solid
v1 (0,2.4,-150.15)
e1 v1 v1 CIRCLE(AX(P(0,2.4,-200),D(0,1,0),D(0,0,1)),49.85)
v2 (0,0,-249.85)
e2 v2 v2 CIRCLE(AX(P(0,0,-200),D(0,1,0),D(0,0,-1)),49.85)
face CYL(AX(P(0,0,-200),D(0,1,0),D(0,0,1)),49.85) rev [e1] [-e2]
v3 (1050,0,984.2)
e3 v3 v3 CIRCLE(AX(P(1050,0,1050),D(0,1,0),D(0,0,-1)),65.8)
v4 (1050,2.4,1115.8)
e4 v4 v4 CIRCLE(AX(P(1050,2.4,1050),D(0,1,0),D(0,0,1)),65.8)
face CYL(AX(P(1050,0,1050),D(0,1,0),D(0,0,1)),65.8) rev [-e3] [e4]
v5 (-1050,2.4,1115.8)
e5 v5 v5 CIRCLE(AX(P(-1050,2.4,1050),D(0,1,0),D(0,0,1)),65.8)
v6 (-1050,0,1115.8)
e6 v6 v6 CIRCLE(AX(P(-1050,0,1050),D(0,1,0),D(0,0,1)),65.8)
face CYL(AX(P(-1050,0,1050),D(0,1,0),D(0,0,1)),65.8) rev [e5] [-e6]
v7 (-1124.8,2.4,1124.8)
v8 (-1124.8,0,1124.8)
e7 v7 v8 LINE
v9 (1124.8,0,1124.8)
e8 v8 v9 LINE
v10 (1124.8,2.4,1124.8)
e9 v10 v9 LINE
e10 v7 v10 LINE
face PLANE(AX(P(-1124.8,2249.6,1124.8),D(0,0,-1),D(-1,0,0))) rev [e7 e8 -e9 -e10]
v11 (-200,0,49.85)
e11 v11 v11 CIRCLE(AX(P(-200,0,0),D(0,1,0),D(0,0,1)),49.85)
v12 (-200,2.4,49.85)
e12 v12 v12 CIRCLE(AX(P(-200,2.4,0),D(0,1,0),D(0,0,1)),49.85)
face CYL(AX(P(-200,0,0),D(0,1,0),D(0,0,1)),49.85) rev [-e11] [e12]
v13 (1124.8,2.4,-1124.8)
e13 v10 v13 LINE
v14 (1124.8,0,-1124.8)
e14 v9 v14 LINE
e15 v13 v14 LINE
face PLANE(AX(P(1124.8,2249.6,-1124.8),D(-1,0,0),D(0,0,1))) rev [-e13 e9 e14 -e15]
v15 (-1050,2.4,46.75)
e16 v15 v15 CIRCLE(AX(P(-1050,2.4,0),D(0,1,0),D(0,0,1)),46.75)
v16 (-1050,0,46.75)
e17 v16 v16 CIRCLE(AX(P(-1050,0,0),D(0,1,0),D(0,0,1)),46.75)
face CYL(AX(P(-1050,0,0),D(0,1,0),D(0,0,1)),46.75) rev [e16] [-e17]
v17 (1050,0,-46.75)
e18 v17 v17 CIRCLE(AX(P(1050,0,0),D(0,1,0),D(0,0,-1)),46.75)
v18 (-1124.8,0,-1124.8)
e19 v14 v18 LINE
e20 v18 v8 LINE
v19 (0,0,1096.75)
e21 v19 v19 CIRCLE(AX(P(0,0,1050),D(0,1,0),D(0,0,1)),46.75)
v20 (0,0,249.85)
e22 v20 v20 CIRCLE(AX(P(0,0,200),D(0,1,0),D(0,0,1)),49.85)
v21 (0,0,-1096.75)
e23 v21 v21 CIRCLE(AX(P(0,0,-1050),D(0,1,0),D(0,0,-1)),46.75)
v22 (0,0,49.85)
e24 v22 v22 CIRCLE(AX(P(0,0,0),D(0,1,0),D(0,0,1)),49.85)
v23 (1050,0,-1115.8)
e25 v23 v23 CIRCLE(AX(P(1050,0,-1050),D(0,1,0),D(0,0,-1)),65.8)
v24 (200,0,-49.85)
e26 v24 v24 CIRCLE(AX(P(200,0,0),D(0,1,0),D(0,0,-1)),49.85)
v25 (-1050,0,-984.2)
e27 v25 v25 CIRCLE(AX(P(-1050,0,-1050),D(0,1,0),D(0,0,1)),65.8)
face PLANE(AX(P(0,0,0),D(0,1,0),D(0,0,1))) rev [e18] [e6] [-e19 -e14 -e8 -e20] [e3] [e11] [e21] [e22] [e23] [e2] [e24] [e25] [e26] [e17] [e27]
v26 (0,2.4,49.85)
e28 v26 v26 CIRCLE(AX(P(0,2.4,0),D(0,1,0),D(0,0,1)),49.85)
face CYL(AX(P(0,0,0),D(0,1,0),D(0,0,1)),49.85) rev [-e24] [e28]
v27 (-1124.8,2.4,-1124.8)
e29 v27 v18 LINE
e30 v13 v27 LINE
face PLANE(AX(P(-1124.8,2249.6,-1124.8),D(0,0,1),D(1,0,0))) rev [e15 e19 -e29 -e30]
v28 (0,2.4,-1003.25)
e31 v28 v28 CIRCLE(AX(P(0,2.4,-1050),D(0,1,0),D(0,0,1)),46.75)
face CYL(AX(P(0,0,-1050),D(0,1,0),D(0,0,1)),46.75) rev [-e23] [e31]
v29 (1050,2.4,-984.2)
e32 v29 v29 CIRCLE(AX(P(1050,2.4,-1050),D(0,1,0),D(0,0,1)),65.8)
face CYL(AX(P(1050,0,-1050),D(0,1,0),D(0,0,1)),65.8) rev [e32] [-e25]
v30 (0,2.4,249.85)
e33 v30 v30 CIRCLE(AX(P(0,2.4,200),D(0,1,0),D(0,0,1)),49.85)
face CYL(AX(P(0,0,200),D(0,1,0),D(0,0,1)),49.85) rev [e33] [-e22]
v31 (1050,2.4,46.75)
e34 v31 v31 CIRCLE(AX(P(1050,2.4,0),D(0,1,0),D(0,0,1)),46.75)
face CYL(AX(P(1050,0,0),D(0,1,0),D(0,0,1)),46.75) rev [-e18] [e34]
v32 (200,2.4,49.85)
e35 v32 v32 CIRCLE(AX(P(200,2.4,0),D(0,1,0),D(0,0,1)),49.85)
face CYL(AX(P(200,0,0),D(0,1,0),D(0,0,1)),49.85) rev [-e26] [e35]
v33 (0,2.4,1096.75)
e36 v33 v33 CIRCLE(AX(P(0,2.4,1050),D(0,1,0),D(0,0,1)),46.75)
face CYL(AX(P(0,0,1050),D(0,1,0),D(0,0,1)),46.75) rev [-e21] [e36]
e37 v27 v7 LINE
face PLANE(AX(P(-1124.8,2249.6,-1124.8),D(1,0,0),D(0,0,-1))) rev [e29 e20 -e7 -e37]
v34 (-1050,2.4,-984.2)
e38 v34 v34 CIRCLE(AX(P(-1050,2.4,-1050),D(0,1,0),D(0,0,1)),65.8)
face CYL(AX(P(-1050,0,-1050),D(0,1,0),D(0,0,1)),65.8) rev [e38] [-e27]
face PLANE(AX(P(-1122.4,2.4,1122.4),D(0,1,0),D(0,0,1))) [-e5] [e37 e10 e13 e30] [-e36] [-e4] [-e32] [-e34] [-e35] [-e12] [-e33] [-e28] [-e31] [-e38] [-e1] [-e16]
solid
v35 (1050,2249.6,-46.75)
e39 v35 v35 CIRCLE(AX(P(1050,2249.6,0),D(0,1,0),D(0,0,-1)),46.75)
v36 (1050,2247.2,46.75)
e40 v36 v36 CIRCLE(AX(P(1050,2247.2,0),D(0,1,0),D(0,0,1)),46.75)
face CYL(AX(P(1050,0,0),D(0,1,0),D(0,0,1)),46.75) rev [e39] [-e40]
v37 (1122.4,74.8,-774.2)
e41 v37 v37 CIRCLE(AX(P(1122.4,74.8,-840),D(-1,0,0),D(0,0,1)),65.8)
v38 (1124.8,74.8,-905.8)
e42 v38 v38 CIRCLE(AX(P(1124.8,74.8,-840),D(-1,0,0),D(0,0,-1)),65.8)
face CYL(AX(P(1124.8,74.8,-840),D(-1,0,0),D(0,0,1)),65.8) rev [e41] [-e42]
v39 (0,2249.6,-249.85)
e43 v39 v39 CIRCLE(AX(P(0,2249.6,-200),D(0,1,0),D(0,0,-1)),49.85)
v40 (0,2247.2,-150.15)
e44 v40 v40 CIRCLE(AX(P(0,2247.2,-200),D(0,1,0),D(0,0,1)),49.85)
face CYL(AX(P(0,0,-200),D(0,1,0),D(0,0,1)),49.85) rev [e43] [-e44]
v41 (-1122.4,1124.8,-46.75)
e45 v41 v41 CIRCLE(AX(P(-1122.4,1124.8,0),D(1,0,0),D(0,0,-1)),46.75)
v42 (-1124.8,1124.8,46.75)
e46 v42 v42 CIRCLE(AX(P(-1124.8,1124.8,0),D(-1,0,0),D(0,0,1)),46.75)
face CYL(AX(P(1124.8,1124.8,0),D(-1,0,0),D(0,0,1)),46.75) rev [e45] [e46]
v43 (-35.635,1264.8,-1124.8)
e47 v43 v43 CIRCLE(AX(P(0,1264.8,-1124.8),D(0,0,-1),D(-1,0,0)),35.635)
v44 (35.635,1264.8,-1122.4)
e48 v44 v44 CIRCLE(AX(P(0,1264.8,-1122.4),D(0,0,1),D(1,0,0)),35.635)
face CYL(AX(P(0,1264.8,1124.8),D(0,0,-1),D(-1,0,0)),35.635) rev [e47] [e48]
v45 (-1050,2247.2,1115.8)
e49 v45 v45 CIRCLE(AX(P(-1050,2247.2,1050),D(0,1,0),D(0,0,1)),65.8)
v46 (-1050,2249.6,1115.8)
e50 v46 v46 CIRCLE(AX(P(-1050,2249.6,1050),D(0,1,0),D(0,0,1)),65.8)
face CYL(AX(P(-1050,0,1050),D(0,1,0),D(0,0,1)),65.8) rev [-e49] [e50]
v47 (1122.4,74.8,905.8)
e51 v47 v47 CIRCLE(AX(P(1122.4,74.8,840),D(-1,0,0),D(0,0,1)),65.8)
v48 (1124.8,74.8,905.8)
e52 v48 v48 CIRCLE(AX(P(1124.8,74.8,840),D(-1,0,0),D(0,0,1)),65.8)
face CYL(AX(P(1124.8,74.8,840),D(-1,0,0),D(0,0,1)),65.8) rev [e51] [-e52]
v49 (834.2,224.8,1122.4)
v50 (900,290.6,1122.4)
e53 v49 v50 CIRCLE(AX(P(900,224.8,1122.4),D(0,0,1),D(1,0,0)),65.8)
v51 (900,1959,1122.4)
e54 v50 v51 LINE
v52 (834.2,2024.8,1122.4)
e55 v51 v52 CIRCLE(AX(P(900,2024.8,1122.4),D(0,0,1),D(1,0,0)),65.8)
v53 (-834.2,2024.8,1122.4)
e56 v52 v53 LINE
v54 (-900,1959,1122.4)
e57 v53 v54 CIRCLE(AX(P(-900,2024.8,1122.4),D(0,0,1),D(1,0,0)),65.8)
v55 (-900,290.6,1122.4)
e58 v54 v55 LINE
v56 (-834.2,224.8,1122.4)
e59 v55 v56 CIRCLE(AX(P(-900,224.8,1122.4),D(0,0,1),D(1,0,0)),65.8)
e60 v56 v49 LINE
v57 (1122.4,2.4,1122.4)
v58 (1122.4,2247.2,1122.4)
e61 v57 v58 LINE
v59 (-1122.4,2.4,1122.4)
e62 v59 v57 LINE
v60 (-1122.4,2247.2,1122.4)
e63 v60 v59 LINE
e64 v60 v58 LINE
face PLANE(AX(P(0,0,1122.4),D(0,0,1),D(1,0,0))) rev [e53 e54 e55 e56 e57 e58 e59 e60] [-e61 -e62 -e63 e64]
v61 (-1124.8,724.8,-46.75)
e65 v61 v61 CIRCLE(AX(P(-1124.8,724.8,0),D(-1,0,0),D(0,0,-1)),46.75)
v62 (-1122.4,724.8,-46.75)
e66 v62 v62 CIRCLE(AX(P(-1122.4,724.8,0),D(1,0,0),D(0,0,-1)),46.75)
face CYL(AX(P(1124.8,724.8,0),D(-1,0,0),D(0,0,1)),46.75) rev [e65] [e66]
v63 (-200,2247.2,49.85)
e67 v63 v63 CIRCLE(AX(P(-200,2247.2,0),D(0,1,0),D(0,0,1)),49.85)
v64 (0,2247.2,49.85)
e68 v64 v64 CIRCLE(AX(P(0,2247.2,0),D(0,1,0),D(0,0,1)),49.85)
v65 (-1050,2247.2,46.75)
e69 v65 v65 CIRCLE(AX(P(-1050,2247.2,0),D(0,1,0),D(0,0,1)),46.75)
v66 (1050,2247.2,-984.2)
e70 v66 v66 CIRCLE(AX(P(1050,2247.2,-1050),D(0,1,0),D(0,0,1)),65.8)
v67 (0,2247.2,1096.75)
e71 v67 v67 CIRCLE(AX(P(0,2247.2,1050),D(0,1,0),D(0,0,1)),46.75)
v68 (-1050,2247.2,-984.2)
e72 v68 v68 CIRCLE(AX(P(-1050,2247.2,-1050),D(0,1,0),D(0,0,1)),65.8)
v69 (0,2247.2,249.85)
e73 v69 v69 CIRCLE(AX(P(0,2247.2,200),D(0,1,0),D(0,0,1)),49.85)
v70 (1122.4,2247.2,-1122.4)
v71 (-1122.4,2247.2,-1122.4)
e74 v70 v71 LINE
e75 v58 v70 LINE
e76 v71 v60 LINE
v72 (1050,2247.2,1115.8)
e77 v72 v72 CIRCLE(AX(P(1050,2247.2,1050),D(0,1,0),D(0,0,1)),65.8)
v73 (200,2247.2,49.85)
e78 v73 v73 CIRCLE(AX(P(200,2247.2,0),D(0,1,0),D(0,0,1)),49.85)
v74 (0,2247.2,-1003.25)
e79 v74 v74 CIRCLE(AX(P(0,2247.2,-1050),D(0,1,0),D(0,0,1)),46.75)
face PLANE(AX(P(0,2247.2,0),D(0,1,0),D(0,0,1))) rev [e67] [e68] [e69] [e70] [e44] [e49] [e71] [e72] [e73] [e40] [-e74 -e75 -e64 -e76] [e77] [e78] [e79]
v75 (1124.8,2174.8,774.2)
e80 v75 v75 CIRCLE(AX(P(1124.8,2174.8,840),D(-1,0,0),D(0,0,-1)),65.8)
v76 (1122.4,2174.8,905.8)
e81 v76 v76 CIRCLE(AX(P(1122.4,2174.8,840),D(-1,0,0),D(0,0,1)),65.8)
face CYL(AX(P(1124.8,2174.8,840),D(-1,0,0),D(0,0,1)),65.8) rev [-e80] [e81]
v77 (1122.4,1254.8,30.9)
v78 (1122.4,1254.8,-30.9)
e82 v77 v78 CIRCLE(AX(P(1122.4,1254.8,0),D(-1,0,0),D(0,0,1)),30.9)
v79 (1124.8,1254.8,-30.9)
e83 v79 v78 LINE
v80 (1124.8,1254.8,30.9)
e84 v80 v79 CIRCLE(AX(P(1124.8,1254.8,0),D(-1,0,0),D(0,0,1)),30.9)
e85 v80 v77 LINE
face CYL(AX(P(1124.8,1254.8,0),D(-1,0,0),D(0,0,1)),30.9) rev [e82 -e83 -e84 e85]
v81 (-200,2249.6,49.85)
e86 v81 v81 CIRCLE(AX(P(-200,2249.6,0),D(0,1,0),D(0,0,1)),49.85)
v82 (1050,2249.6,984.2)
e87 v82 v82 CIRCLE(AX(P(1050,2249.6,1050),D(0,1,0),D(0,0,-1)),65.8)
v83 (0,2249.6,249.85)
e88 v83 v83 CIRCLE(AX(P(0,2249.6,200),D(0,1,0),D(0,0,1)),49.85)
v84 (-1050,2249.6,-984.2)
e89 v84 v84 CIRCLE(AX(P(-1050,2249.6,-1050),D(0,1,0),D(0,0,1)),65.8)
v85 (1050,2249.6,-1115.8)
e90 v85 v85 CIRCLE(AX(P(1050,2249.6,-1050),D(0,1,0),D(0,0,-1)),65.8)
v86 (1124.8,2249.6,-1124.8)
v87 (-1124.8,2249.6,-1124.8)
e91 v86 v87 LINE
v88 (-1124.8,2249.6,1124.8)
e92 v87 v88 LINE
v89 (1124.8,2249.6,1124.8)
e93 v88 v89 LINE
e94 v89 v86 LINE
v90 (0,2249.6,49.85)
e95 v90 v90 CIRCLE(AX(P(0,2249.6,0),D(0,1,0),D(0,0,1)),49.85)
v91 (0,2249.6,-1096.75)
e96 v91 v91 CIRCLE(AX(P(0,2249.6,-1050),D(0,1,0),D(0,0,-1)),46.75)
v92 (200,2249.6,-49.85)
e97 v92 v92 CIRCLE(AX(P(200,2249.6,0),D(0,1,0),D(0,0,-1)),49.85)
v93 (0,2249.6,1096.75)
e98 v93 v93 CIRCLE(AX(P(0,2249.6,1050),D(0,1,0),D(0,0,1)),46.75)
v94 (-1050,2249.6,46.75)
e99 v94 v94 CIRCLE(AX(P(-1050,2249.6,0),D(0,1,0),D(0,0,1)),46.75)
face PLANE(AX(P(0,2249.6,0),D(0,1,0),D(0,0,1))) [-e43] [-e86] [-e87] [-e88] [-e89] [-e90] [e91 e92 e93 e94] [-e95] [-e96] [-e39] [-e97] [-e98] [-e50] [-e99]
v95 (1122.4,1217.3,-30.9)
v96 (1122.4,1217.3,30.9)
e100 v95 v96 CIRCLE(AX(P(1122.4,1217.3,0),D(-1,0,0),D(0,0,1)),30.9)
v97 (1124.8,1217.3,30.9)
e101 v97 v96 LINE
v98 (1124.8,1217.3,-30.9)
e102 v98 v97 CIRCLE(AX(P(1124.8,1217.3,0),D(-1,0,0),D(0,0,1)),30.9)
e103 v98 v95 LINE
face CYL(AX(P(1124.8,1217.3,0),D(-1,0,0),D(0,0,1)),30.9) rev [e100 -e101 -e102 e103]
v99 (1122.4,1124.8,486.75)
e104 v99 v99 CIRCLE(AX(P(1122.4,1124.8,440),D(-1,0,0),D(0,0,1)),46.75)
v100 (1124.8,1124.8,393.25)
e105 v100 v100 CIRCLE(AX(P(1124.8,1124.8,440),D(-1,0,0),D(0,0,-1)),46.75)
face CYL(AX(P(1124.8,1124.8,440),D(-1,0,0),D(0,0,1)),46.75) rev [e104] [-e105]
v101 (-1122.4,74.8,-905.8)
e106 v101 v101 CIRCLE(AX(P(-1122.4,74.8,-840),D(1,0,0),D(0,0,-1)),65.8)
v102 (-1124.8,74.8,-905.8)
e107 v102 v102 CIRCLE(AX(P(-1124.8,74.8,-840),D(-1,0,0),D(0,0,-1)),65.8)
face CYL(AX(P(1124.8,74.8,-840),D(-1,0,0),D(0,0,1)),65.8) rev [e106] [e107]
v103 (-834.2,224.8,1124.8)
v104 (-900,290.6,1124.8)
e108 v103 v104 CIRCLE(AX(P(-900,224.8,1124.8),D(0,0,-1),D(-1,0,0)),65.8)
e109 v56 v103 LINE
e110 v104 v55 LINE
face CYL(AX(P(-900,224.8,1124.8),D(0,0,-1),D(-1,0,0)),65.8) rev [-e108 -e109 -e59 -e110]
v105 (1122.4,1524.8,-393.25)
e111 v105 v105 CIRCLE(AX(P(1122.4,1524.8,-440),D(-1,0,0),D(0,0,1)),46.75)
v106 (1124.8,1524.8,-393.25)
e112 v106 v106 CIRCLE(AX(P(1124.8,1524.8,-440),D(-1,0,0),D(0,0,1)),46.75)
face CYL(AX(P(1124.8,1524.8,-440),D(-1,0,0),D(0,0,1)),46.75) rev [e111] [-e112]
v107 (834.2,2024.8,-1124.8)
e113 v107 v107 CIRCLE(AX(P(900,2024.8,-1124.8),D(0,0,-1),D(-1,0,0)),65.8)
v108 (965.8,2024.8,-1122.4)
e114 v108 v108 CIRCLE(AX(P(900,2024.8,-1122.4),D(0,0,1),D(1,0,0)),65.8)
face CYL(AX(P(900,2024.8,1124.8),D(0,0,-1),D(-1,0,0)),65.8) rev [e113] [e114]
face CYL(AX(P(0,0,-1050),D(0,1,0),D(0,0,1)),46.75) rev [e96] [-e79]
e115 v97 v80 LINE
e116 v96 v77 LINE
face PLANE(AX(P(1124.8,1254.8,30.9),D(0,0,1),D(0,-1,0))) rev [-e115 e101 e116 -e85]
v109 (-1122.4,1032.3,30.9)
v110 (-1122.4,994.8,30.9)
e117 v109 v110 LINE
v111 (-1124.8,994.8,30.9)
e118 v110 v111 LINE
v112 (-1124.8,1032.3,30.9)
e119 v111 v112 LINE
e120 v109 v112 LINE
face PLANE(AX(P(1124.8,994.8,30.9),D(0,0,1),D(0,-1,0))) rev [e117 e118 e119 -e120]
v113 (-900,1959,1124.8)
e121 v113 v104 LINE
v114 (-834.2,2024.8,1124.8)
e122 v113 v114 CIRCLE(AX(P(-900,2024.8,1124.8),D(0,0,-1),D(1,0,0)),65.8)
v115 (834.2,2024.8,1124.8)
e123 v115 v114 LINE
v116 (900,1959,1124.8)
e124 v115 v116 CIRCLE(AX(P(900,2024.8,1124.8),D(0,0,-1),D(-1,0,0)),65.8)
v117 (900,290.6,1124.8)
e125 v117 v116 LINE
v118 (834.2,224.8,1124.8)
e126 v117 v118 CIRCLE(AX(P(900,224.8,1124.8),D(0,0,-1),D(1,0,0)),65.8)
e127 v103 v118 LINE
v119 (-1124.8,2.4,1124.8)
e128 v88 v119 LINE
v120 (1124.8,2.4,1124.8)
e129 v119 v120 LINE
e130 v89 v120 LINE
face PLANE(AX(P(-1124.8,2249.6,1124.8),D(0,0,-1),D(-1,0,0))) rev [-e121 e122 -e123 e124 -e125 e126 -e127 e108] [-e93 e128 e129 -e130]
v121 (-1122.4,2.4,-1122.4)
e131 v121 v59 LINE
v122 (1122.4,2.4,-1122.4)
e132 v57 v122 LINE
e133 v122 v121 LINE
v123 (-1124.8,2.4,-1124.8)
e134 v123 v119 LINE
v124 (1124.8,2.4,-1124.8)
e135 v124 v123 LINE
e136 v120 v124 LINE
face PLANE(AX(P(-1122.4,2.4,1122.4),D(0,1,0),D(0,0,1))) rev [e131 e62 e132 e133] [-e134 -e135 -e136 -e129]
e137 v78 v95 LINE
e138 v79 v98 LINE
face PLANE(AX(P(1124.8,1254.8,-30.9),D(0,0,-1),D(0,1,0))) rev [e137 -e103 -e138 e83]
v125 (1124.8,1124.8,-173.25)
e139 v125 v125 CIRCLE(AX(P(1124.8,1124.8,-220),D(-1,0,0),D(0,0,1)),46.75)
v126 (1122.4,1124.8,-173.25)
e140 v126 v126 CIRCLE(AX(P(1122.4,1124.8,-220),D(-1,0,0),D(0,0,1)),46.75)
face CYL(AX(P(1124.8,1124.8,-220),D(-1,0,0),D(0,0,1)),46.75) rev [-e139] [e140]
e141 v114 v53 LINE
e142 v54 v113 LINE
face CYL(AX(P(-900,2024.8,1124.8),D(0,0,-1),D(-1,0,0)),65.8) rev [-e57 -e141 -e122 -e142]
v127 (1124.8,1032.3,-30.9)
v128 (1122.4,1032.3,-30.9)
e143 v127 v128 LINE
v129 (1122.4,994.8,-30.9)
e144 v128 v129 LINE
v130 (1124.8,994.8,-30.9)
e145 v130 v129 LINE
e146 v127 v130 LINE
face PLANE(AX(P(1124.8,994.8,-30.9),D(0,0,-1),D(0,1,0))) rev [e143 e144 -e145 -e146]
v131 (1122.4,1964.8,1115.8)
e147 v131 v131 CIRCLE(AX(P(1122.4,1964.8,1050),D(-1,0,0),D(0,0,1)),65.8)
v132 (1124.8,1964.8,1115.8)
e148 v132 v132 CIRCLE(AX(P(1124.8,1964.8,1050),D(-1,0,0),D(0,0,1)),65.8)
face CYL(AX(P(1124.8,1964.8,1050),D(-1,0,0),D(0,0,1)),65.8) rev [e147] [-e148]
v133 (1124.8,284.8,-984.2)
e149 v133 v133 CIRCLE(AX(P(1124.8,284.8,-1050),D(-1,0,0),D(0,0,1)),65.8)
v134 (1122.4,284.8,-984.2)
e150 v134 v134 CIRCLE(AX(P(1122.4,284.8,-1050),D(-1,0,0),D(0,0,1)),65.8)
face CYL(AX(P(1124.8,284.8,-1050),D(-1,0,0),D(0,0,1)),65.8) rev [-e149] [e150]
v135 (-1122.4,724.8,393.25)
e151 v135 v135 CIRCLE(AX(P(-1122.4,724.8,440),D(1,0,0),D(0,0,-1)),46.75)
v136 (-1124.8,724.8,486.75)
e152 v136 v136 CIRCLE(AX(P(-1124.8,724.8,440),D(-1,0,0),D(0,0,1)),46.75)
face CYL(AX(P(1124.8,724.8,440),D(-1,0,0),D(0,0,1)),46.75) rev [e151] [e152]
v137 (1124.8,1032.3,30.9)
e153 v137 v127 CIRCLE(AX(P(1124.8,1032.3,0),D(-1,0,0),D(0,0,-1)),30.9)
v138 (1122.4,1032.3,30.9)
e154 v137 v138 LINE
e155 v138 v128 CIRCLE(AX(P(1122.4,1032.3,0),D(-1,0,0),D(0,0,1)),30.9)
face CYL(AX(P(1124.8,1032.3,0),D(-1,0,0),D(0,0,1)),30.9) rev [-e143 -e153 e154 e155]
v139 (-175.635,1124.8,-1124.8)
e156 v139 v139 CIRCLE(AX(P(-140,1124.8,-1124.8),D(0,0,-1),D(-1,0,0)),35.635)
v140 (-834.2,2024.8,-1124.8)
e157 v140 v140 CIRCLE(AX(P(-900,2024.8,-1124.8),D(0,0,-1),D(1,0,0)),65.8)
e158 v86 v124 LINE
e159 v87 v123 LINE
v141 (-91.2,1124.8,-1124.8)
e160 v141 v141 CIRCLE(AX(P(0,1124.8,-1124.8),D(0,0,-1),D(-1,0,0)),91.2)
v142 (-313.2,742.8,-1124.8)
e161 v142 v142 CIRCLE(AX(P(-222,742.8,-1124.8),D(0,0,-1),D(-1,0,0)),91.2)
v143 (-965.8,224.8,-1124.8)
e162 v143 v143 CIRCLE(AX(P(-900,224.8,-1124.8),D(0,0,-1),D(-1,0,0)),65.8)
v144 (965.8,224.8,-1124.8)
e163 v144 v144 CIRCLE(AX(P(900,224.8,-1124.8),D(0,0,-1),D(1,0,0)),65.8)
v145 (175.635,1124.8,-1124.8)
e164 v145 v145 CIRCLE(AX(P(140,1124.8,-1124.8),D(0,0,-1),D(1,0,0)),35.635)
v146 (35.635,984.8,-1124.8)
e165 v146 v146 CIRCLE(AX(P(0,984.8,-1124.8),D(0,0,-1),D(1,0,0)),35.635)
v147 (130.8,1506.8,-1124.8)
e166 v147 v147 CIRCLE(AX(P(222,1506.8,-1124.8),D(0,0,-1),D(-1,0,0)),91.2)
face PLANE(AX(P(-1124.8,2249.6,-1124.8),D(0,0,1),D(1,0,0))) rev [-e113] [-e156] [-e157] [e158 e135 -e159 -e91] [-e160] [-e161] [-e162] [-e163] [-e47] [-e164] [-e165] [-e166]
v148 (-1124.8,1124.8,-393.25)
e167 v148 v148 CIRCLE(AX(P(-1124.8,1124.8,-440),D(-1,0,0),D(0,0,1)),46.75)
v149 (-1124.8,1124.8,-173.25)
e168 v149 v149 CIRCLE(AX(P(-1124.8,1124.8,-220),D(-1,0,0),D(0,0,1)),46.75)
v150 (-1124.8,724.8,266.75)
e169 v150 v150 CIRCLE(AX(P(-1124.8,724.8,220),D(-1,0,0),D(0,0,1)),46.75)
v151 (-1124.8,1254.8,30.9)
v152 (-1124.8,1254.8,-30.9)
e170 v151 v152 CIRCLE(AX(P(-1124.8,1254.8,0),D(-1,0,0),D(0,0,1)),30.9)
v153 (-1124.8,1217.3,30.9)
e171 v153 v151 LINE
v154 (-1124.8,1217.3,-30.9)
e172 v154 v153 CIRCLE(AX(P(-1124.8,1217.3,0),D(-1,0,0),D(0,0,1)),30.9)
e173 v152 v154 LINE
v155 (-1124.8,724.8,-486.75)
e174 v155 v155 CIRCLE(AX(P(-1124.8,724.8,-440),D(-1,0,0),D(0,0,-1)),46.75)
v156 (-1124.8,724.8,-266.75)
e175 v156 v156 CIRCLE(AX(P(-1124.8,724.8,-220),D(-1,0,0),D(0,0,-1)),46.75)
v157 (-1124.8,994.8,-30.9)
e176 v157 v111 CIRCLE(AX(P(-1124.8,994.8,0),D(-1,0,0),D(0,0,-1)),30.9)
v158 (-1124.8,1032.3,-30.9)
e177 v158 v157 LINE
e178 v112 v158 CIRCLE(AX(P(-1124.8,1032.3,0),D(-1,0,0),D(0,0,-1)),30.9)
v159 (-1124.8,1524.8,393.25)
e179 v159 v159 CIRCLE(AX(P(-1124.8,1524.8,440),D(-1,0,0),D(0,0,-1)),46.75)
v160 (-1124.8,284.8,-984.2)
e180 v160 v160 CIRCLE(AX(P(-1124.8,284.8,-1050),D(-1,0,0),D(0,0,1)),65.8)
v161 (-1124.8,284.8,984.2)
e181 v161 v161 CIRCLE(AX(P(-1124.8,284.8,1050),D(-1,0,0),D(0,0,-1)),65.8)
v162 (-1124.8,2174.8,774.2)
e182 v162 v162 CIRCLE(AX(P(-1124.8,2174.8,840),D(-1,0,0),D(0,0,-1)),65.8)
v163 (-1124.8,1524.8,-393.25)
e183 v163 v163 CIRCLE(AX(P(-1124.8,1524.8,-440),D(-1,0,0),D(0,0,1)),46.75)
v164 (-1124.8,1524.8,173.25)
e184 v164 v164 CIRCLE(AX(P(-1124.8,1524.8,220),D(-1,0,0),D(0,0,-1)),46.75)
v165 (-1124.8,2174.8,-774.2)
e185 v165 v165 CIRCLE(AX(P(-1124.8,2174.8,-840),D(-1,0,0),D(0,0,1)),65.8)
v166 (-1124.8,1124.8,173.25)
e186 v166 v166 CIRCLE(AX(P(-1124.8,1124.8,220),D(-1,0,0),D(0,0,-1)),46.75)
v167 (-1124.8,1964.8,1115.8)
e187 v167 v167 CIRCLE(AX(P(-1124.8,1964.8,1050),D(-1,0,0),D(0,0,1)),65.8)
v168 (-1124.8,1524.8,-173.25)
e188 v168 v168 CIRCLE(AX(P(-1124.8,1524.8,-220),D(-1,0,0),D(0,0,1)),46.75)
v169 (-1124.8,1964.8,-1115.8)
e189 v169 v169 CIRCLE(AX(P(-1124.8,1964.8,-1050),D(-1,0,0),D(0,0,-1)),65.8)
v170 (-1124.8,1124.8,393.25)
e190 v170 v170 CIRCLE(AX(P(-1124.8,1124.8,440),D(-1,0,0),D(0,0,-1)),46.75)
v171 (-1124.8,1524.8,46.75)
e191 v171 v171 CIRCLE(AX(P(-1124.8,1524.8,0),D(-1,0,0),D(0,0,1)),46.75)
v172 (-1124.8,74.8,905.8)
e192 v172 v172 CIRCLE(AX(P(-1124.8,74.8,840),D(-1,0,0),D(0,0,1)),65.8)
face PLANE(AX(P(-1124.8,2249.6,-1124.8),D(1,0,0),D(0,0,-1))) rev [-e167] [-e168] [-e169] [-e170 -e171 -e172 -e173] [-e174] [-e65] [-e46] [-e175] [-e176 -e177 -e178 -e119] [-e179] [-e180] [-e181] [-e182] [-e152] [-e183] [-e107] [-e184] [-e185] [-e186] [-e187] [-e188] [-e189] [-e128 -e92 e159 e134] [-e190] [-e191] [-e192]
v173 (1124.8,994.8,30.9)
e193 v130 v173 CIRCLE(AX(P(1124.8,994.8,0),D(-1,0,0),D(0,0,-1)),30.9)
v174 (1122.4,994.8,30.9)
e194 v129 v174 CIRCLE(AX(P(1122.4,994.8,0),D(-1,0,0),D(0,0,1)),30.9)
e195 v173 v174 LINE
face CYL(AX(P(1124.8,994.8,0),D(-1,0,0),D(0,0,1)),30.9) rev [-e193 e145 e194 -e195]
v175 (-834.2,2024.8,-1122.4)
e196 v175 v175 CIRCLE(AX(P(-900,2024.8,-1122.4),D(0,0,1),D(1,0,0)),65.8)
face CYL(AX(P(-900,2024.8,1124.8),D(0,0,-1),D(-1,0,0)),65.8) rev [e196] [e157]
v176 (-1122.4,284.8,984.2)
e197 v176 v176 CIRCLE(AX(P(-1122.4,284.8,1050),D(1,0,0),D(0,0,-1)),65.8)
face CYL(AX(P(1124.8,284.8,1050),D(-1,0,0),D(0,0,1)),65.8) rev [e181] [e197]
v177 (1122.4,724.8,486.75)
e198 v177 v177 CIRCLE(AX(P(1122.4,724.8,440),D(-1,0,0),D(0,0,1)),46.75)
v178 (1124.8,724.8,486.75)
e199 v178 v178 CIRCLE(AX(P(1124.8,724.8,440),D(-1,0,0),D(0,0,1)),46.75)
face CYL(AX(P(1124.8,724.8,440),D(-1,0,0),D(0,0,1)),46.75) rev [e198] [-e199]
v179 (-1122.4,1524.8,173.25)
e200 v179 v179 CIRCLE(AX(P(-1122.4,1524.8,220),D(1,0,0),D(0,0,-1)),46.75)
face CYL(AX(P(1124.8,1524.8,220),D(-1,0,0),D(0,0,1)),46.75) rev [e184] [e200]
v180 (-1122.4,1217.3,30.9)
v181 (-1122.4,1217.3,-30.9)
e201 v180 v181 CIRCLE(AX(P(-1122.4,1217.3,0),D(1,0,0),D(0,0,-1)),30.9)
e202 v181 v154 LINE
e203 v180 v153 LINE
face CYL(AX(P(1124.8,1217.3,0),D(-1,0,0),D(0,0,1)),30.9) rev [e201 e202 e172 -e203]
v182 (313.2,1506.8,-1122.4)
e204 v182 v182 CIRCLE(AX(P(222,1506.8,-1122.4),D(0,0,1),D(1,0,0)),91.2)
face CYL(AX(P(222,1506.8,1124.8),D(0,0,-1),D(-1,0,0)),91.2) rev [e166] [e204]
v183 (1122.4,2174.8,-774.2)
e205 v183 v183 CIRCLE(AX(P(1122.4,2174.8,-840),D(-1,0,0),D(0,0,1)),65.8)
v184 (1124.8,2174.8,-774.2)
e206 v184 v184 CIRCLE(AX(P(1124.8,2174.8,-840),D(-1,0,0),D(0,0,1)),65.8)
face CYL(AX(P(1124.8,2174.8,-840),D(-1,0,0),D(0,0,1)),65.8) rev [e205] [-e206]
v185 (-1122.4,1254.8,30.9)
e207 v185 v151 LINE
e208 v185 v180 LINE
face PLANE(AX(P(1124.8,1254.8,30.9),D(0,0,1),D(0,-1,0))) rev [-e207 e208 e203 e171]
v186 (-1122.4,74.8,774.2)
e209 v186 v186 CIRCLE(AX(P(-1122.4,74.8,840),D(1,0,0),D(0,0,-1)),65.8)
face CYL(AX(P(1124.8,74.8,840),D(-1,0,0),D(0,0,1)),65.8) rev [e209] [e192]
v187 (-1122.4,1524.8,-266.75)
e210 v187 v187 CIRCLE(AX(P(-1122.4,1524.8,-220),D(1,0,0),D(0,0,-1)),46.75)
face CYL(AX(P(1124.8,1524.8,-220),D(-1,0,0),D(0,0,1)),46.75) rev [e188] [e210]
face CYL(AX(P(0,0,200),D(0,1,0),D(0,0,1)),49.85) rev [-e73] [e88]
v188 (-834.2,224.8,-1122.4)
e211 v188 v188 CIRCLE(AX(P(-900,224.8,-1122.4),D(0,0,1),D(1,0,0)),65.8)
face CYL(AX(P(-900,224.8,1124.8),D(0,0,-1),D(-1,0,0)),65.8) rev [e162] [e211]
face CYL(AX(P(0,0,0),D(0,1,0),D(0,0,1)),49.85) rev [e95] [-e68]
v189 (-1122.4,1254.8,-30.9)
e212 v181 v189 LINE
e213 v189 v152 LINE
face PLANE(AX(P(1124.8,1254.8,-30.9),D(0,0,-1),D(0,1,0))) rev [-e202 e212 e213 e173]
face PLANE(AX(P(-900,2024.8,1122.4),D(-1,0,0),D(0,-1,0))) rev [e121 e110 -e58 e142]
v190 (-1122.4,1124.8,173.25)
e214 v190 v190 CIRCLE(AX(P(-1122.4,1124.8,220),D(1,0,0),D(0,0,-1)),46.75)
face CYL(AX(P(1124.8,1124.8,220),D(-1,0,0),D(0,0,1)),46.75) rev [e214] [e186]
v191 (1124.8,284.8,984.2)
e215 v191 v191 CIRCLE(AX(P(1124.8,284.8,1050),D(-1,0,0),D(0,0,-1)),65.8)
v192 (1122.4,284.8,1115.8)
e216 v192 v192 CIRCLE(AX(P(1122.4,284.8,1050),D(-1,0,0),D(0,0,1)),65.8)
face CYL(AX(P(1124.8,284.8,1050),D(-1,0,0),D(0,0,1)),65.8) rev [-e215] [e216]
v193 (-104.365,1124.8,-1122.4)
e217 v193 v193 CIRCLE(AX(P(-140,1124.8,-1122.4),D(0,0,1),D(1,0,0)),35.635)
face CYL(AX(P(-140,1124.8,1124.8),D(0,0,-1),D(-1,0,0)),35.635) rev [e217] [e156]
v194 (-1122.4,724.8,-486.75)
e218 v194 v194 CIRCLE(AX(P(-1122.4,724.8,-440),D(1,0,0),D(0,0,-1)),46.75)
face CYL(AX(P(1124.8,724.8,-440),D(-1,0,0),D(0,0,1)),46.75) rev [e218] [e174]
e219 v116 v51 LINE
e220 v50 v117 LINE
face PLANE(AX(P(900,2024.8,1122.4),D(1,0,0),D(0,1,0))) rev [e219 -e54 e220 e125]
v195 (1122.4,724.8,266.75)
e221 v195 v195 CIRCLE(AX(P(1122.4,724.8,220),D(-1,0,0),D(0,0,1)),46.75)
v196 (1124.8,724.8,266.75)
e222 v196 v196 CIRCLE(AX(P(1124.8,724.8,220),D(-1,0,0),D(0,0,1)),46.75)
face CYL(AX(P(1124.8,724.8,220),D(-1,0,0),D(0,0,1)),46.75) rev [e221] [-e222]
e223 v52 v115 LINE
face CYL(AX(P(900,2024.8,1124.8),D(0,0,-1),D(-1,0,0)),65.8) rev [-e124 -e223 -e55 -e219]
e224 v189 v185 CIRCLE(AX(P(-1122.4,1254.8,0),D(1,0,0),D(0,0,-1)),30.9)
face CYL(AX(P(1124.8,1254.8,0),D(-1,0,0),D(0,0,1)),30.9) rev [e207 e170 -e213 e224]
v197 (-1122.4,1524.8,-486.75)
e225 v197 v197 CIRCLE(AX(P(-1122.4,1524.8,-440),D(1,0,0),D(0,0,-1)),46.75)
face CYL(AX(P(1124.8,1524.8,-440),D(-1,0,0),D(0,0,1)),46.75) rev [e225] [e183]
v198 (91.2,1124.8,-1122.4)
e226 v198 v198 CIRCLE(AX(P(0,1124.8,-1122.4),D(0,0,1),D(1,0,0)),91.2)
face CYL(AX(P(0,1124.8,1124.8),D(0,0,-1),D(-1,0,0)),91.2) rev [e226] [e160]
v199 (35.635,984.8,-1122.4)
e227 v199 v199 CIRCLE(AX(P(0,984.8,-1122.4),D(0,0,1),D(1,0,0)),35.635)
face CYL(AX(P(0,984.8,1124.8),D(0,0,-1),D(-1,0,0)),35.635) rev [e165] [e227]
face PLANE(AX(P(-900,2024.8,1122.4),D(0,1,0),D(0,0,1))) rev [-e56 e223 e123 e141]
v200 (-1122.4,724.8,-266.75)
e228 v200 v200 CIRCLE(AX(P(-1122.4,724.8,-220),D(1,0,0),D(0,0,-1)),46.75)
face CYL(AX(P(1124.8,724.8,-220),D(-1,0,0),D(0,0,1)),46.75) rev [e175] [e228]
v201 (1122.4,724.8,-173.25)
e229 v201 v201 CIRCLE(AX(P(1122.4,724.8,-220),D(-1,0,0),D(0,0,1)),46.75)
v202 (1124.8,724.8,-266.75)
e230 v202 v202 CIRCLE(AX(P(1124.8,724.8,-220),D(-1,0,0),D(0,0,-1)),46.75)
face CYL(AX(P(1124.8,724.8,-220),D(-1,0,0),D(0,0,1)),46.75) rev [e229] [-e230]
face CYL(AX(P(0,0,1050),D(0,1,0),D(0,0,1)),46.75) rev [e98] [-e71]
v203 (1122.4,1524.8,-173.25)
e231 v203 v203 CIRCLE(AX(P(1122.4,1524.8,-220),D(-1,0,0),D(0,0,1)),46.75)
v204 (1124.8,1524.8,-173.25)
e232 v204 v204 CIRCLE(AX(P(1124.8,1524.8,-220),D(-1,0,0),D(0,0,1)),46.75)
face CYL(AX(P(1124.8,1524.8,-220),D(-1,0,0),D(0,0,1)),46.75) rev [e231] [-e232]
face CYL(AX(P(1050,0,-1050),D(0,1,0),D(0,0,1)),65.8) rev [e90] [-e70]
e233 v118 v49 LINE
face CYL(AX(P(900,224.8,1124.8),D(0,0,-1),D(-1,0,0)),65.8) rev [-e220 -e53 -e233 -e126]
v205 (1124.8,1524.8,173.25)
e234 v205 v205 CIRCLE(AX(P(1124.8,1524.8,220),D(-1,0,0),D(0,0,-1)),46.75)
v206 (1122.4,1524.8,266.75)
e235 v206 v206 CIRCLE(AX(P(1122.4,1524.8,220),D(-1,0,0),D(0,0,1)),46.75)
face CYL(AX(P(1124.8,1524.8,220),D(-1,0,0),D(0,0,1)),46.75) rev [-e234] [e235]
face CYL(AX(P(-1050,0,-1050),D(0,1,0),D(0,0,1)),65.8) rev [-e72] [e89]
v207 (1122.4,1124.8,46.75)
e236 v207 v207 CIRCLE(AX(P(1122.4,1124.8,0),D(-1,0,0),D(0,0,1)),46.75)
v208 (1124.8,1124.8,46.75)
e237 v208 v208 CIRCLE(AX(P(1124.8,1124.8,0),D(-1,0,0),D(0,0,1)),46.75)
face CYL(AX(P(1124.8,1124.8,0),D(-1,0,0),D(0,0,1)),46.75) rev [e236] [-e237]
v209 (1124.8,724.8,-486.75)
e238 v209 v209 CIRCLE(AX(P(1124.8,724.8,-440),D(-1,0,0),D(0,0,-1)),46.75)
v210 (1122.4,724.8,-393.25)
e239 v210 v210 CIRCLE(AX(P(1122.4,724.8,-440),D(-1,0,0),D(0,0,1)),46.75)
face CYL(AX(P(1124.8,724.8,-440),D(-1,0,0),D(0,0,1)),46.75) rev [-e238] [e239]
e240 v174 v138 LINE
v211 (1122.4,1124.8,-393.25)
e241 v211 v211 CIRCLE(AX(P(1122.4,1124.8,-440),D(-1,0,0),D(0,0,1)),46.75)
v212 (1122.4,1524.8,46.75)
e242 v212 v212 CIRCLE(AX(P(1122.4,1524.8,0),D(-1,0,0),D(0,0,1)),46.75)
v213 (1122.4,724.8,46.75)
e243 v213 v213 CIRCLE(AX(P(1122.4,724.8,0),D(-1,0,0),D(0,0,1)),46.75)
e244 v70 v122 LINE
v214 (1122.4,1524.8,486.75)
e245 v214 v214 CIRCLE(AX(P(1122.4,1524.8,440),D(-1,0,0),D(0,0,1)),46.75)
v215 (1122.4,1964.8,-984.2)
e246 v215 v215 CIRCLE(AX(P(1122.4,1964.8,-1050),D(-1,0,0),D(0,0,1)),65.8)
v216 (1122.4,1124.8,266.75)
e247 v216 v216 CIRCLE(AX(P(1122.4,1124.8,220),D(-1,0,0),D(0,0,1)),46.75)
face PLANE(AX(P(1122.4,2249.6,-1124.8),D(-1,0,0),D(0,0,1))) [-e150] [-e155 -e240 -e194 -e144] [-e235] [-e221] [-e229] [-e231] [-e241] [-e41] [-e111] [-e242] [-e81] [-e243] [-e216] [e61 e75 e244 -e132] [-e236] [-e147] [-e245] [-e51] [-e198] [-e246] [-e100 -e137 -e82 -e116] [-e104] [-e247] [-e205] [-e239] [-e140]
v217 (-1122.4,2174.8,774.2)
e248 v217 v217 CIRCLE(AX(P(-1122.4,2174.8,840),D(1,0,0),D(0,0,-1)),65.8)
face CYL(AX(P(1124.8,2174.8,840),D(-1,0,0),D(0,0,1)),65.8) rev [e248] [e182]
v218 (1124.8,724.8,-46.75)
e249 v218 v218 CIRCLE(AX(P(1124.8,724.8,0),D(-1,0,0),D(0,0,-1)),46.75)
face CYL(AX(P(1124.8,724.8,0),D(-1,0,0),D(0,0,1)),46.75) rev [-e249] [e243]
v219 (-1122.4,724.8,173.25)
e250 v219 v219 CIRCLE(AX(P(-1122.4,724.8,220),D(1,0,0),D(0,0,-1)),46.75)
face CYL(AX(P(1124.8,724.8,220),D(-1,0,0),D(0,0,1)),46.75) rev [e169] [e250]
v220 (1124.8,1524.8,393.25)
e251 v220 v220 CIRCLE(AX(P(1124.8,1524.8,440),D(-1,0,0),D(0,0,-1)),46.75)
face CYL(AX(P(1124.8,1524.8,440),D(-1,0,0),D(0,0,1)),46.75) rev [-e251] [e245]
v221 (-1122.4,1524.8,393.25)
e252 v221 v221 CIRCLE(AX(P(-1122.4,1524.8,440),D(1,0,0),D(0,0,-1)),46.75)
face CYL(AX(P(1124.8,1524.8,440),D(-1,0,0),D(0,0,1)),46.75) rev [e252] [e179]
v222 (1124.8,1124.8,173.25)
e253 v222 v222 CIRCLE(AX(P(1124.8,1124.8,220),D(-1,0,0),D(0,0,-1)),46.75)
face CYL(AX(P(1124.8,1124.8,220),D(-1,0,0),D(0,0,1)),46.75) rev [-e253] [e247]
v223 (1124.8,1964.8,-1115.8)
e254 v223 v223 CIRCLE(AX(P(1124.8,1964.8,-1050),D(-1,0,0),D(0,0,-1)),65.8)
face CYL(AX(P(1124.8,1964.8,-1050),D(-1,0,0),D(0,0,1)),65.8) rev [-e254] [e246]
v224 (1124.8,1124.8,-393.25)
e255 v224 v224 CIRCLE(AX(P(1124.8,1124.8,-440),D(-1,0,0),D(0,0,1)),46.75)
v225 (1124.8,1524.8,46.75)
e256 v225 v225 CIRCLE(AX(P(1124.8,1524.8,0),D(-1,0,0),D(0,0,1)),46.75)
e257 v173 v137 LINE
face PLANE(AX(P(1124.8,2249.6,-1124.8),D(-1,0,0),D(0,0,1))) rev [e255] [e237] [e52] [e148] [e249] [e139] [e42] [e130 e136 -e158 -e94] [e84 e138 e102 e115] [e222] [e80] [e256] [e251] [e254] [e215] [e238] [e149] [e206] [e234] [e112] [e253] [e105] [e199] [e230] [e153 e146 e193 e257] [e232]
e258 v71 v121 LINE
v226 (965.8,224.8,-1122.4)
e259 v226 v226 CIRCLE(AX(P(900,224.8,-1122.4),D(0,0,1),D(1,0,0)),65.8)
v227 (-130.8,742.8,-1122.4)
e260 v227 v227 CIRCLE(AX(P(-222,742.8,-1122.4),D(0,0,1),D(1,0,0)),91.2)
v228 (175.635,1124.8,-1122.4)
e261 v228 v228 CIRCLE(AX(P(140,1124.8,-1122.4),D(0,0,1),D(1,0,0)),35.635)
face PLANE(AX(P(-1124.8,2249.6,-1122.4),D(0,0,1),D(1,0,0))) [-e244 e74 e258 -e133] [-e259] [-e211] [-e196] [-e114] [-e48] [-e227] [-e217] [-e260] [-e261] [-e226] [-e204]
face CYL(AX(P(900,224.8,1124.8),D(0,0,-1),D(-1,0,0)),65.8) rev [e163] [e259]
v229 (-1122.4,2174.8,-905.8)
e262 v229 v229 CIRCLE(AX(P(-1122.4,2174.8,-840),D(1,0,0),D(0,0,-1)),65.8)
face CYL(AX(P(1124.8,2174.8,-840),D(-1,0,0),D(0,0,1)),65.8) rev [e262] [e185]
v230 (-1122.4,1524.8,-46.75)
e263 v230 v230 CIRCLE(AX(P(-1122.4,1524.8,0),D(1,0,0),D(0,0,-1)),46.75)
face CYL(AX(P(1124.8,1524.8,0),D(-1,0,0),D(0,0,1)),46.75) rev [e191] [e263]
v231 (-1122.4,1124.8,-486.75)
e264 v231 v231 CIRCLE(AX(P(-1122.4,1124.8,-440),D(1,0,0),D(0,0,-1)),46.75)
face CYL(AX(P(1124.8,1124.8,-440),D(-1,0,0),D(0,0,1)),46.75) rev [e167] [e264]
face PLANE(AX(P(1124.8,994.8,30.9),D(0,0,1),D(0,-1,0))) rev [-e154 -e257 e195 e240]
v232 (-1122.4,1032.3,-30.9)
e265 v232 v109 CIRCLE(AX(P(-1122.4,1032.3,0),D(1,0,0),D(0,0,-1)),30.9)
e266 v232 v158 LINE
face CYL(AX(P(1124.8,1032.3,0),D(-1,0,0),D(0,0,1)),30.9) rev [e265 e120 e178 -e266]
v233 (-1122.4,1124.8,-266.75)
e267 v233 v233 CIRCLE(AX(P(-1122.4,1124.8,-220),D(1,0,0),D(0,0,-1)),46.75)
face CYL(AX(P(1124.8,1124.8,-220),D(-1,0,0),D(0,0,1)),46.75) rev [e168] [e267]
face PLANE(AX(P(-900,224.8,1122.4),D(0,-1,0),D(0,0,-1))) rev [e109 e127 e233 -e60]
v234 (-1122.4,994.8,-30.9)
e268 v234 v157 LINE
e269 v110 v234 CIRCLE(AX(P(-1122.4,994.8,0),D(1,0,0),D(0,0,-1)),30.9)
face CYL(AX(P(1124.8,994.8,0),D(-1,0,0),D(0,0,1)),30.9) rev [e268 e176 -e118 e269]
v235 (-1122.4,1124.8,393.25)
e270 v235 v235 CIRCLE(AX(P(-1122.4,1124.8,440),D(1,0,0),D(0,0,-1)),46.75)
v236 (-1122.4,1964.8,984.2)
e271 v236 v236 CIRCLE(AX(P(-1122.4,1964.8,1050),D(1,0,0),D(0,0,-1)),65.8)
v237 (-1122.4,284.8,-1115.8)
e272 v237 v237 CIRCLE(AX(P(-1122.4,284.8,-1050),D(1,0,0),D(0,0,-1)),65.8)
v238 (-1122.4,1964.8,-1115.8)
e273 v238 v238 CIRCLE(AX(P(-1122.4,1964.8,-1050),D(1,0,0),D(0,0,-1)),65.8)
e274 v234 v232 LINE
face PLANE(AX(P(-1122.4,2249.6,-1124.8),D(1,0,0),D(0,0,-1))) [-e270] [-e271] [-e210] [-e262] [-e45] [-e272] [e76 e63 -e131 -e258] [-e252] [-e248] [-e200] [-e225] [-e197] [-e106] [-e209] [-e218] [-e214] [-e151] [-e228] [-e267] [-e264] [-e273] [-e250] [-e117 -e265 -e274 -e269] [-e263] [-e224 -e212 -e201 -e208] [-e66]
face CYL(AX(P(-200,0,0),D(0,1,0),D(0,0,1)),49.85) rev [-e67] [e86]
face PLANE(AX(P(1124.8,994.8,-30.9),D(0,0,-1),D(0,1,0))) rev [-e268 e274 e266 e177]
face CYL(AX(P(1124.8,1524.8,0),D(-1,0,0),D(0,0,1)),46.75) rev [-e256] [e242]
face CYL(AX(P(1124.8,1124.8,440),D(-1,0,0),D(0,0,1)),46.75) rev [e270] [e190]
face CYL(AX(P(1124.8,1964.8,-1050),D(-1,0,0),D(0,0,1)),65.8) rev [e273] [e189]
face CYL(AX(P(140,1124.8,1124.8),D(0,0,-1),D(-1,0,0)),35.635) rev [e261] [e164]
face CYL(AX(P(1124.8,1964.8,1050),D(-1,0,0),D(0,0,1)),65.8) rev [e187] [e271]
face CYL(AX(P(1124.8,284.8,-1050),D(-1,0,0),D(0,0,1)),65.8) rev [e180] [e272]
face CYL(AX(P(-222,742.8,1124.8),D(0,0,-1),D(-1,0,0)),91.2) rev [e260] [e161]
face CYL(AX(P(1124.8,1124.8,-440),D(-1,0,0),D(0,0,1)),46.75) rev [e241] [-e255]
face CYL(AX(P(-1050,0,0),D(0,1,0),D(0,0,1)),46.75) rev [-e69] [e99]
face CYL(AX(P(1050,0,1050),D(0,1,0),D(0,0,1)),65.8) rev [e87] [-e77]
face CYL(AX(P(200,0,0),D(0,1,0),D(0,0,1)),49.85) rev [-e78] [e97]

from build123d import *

# Parameters (mm, degrees)
SKETCH1_W           = 2249.6
SKETCH1_H           = 2249.6
BOSS_EXTRUDE1_DEPTH = 2249.6
SHELL1_T            = -2.4
SKETCH2_W           = 2249.6
SKETCH2_H           = 2249.6
SKETCH2_W_2         = 1800
SKETCH2_H_2         = 1800
BOSS_EXTRUDE3_DEPTH = 2.4
SKETCH3_R           = 49.85
SKETCH3_R_2         = 46.75
SKETCH3_R_3         = 65.8
CUT_EXTRUDE1_DEPTH  = 2756.186062683
SKETCH4_R           = 46.75
SKETCH4_R_2         = 65.8
CUT_EXTRUDE2_DEPTH  = 3375.4
SKETCH5_R           = 91.2
SKETCH5_R_2         = 35.635
SKETCH5_R_3         = 65.8
CUT_EXTRUDE3_DEPTH  = 3375.4


with BuildPart() as part:
    # Sketch1 → Boss-Extrude1 (new body)
    with BuildSketch(Plane(origin=(0, 0, 0), x_dir=(1, 0, 0), z_dir=(0, 1, 0))):
        Rectangle(SKETCH1_W, SKETCH1_H)
    extrude(amount=BOSS_EXTRUDE1_DEPTH)

    # Shell1
    shell1_openings = [part.faces().sort_by_distance(p)[0] for p in [
        (0, 1124.8, 1124.8),
    ]]
    offset(amount=SHELL1_T, openings=shell1_openings, kind=Kind.INTERSECTION)

    # Sketch2 → Boss-Extrude3 (add)
    with BuildSketch(Plane.XY.offset(1124.8)):
        with Locations((0, 1124.8)):
            Rectangle(SKETCH2_W, SKETCH2_H)
        with Locations((0, 1124.8)):
            Rectangle(SKETCH2_W_2, SKETCH2_H_2, mode=Mode.SUBTRACT)
    extrude(amount=-BOSS_EXTRUDE3_DEPTH)

    # Sketch3 → Cut-Extrude1 (cut, through all)
    with BuildSketch(Plane(origin=(0, 2249.6, 0), x_dir=(1, 0, 0), z_dir=(0, 1, 0))):
        Circle(SKETCH3_R)
        with Locations((-200, 0)):
            Circle(SKETCH3_R)
        with Locations((-1050, 0)):
            Circle(SKETCH3_R_2)
        with Locations((-1050, 1050)):
            Circle(SKETCH3_R_3)
        with Locations((1050, 1050)):
            Circle(SKETCH3_R_3)
        with Locations((200, 0)):
            Circle(SKETCH3_R)
        with Locations((1050, 0)):
            Circle(SKETCH3_R_2)
        with Locations((-1050, -1050)):
            Circle(SKETCH3_R_3)
        with Locations((0, -1050)):
            Circle(SKETCH3_R_2)
        with Locations((0, -200)):
            Circle(SKETCH3_R)
        with Locations((0, 200)):
            Circle(SKETCH3_R)
        with Locations((0, 1050)):
            Circle(SKETCH3_R_2)
        with Locations((1050, -1050)):
            Circle(SKETCH3_R_3)
    extrude(amount=-CUT_EXTRUDE1_DEPTH, mode=Mode.SUBTRACT)

    # Sketch4 → Cut-Extrude2 (cut, through all)
    with BuildSketch(Plane.ZY.offset(1124.8)):
        with Locations((0, 1124.8)):
            Circle(SKETCH4_R)
        with Locations((-220, 1124.8)):
            Circle(SKETCH4_R)
        with Locations((-440, 1124.8)):
            Circle(SKETCH4_R)
        with Locations((220, 1124.8)):
            Circle(SKETCH4_R)
        with Locations((440, 1124.8)):
            Circle(SKETCH4_R)
        with Locations((-440, 1524.8)):
            Circle(SKETCH4_R)
        with Locations((-220, 1524.8)):
            Circle(SKETCH4_R)
        with Locations((0, 1524.8)):
            Circle(SKETCH4_R)
        with Locations((220, 1524.8)):
            Circle(SKETCH4_R)
        with Locations((440, 1524.8)):
            Circle(SKETCH4_R)
        with Locations((440, 724.8)):
            Circle(SKETCH4_R)
        with Locations((220, 724.8)):
            Circle(SKETCH4_R)
        with Locations((0, 724.8)):
            Circle(SKETCH4_R)
        with Locations((-220, 724.8)):
            Circle(SKETCH4_R)
        with Locations((-440, 724.8)):
            Circle(SKETCH4_R)
        with Locations((-840, 2174.8)):
            Circle(SKETCH4_R_2)
        with Locations((-1050, 1964.8)):
            Circle(SKETCH4_R_2)
        with Locations((1050, 1964.8)):
            Circle(SKETCH4_R_2)
        with Locations((840, 2174.8)):
            Circle(SKETCH4_R_2)
        with Locations((1050, 284.8)):
            Circle(SKETCH4_R_2)
        with Locations((840, 74.8)):
            Circle(SKETCH4_R_2)
        with Locations((-840, 74.8)):
            Circle(SKETCH4_R_2)
        with Locations((-1050, 284.8)):
            Circle(SKETCH4_R_2)
        with BuildLine():
            Line((30.9, 1254.8), (30.9, 1217.3))
            ThreePointArc((30.9, 1217.3), (0, 1186.4), (-30.9, 1217.3))
            Line((-30.9, 1217.3), (-30.9, 1254.8))
            ThreePointArc((-30.9, 1254.8), (0, 1285.7), (30.9, 1254.8))
        make_face()
        with BuildLine():
            Line((30.9, 994.8), (30.9, 1032.3))
            ThreePointArc((30.9, 1032.3), (0, 1063.2), (-30.9, 1032.3))
            Line((-30.9, 1032.3), (-30.9, 994.8))
            ThreePointArc((-30.9, 994.8), (0, 963.9), (30.9, 994.8))
        make_face()
    extrude(amount=-CUT_EXTRUDE2_DEPTH, mode=Mode.SUBTRACT)

    # Sketch5 → Cut-Extrude3 (cut, through all)
    with BuildSketch(Plane(origin=(0, 0, -1124.8), x_dir=(-1, 0, 0), z_dir=(0, 0, -1))):
        with Locations((0, 1124.8)):
            Circle(SKETCH5_R)
        with Locations((0, 1264.8)):
            Circle(SKETCH5_R_2)
        with Locations((0, 984.8)):
            Circle(SKETCH5_R_2)
        with Locations((140, 1124.8)):
            Circle(SKETCH5_R_2)
        with Locations((-140, 1124.8)):
            Circle(SKETCH5_R_2)
        with Locations((-222, 1506.8)):
            Circle(SKETCH5_R)
        with Locations((222, 742.8)):
            Circle(SKETCH5_R)
        with Locations((-900, 2024.8)):
            Circle(SKETCH5_R_3)
        with Locations((900, 2024.8)):
            Circle(SKETCH5_R_3)
        with Locations((900, 224.8)):
            Circle(SKETCH5_R_3)
        with Locations((-900, 224.8)):
            Circle(SKETCH5_R_3)
    extrude(amount=-CUT_EXTRUDE3_DEPTH, mode=Mode.SUBTRACT)


with BuildPart() as body_2:
    # Split1: the piece on the far side of the plane
    add(part.part)
    split(bisect_by=Plane.ZX.offset(2.4), keep=Keep.BOTTOM)


with BuildPart() as part_1:
    add(part.part)

    # Split1
    split(bisect_by=Plane.ZX.offset(2.4), keep=Keep.TOP)


solid = Compound([body_2.part, part_1.part])
